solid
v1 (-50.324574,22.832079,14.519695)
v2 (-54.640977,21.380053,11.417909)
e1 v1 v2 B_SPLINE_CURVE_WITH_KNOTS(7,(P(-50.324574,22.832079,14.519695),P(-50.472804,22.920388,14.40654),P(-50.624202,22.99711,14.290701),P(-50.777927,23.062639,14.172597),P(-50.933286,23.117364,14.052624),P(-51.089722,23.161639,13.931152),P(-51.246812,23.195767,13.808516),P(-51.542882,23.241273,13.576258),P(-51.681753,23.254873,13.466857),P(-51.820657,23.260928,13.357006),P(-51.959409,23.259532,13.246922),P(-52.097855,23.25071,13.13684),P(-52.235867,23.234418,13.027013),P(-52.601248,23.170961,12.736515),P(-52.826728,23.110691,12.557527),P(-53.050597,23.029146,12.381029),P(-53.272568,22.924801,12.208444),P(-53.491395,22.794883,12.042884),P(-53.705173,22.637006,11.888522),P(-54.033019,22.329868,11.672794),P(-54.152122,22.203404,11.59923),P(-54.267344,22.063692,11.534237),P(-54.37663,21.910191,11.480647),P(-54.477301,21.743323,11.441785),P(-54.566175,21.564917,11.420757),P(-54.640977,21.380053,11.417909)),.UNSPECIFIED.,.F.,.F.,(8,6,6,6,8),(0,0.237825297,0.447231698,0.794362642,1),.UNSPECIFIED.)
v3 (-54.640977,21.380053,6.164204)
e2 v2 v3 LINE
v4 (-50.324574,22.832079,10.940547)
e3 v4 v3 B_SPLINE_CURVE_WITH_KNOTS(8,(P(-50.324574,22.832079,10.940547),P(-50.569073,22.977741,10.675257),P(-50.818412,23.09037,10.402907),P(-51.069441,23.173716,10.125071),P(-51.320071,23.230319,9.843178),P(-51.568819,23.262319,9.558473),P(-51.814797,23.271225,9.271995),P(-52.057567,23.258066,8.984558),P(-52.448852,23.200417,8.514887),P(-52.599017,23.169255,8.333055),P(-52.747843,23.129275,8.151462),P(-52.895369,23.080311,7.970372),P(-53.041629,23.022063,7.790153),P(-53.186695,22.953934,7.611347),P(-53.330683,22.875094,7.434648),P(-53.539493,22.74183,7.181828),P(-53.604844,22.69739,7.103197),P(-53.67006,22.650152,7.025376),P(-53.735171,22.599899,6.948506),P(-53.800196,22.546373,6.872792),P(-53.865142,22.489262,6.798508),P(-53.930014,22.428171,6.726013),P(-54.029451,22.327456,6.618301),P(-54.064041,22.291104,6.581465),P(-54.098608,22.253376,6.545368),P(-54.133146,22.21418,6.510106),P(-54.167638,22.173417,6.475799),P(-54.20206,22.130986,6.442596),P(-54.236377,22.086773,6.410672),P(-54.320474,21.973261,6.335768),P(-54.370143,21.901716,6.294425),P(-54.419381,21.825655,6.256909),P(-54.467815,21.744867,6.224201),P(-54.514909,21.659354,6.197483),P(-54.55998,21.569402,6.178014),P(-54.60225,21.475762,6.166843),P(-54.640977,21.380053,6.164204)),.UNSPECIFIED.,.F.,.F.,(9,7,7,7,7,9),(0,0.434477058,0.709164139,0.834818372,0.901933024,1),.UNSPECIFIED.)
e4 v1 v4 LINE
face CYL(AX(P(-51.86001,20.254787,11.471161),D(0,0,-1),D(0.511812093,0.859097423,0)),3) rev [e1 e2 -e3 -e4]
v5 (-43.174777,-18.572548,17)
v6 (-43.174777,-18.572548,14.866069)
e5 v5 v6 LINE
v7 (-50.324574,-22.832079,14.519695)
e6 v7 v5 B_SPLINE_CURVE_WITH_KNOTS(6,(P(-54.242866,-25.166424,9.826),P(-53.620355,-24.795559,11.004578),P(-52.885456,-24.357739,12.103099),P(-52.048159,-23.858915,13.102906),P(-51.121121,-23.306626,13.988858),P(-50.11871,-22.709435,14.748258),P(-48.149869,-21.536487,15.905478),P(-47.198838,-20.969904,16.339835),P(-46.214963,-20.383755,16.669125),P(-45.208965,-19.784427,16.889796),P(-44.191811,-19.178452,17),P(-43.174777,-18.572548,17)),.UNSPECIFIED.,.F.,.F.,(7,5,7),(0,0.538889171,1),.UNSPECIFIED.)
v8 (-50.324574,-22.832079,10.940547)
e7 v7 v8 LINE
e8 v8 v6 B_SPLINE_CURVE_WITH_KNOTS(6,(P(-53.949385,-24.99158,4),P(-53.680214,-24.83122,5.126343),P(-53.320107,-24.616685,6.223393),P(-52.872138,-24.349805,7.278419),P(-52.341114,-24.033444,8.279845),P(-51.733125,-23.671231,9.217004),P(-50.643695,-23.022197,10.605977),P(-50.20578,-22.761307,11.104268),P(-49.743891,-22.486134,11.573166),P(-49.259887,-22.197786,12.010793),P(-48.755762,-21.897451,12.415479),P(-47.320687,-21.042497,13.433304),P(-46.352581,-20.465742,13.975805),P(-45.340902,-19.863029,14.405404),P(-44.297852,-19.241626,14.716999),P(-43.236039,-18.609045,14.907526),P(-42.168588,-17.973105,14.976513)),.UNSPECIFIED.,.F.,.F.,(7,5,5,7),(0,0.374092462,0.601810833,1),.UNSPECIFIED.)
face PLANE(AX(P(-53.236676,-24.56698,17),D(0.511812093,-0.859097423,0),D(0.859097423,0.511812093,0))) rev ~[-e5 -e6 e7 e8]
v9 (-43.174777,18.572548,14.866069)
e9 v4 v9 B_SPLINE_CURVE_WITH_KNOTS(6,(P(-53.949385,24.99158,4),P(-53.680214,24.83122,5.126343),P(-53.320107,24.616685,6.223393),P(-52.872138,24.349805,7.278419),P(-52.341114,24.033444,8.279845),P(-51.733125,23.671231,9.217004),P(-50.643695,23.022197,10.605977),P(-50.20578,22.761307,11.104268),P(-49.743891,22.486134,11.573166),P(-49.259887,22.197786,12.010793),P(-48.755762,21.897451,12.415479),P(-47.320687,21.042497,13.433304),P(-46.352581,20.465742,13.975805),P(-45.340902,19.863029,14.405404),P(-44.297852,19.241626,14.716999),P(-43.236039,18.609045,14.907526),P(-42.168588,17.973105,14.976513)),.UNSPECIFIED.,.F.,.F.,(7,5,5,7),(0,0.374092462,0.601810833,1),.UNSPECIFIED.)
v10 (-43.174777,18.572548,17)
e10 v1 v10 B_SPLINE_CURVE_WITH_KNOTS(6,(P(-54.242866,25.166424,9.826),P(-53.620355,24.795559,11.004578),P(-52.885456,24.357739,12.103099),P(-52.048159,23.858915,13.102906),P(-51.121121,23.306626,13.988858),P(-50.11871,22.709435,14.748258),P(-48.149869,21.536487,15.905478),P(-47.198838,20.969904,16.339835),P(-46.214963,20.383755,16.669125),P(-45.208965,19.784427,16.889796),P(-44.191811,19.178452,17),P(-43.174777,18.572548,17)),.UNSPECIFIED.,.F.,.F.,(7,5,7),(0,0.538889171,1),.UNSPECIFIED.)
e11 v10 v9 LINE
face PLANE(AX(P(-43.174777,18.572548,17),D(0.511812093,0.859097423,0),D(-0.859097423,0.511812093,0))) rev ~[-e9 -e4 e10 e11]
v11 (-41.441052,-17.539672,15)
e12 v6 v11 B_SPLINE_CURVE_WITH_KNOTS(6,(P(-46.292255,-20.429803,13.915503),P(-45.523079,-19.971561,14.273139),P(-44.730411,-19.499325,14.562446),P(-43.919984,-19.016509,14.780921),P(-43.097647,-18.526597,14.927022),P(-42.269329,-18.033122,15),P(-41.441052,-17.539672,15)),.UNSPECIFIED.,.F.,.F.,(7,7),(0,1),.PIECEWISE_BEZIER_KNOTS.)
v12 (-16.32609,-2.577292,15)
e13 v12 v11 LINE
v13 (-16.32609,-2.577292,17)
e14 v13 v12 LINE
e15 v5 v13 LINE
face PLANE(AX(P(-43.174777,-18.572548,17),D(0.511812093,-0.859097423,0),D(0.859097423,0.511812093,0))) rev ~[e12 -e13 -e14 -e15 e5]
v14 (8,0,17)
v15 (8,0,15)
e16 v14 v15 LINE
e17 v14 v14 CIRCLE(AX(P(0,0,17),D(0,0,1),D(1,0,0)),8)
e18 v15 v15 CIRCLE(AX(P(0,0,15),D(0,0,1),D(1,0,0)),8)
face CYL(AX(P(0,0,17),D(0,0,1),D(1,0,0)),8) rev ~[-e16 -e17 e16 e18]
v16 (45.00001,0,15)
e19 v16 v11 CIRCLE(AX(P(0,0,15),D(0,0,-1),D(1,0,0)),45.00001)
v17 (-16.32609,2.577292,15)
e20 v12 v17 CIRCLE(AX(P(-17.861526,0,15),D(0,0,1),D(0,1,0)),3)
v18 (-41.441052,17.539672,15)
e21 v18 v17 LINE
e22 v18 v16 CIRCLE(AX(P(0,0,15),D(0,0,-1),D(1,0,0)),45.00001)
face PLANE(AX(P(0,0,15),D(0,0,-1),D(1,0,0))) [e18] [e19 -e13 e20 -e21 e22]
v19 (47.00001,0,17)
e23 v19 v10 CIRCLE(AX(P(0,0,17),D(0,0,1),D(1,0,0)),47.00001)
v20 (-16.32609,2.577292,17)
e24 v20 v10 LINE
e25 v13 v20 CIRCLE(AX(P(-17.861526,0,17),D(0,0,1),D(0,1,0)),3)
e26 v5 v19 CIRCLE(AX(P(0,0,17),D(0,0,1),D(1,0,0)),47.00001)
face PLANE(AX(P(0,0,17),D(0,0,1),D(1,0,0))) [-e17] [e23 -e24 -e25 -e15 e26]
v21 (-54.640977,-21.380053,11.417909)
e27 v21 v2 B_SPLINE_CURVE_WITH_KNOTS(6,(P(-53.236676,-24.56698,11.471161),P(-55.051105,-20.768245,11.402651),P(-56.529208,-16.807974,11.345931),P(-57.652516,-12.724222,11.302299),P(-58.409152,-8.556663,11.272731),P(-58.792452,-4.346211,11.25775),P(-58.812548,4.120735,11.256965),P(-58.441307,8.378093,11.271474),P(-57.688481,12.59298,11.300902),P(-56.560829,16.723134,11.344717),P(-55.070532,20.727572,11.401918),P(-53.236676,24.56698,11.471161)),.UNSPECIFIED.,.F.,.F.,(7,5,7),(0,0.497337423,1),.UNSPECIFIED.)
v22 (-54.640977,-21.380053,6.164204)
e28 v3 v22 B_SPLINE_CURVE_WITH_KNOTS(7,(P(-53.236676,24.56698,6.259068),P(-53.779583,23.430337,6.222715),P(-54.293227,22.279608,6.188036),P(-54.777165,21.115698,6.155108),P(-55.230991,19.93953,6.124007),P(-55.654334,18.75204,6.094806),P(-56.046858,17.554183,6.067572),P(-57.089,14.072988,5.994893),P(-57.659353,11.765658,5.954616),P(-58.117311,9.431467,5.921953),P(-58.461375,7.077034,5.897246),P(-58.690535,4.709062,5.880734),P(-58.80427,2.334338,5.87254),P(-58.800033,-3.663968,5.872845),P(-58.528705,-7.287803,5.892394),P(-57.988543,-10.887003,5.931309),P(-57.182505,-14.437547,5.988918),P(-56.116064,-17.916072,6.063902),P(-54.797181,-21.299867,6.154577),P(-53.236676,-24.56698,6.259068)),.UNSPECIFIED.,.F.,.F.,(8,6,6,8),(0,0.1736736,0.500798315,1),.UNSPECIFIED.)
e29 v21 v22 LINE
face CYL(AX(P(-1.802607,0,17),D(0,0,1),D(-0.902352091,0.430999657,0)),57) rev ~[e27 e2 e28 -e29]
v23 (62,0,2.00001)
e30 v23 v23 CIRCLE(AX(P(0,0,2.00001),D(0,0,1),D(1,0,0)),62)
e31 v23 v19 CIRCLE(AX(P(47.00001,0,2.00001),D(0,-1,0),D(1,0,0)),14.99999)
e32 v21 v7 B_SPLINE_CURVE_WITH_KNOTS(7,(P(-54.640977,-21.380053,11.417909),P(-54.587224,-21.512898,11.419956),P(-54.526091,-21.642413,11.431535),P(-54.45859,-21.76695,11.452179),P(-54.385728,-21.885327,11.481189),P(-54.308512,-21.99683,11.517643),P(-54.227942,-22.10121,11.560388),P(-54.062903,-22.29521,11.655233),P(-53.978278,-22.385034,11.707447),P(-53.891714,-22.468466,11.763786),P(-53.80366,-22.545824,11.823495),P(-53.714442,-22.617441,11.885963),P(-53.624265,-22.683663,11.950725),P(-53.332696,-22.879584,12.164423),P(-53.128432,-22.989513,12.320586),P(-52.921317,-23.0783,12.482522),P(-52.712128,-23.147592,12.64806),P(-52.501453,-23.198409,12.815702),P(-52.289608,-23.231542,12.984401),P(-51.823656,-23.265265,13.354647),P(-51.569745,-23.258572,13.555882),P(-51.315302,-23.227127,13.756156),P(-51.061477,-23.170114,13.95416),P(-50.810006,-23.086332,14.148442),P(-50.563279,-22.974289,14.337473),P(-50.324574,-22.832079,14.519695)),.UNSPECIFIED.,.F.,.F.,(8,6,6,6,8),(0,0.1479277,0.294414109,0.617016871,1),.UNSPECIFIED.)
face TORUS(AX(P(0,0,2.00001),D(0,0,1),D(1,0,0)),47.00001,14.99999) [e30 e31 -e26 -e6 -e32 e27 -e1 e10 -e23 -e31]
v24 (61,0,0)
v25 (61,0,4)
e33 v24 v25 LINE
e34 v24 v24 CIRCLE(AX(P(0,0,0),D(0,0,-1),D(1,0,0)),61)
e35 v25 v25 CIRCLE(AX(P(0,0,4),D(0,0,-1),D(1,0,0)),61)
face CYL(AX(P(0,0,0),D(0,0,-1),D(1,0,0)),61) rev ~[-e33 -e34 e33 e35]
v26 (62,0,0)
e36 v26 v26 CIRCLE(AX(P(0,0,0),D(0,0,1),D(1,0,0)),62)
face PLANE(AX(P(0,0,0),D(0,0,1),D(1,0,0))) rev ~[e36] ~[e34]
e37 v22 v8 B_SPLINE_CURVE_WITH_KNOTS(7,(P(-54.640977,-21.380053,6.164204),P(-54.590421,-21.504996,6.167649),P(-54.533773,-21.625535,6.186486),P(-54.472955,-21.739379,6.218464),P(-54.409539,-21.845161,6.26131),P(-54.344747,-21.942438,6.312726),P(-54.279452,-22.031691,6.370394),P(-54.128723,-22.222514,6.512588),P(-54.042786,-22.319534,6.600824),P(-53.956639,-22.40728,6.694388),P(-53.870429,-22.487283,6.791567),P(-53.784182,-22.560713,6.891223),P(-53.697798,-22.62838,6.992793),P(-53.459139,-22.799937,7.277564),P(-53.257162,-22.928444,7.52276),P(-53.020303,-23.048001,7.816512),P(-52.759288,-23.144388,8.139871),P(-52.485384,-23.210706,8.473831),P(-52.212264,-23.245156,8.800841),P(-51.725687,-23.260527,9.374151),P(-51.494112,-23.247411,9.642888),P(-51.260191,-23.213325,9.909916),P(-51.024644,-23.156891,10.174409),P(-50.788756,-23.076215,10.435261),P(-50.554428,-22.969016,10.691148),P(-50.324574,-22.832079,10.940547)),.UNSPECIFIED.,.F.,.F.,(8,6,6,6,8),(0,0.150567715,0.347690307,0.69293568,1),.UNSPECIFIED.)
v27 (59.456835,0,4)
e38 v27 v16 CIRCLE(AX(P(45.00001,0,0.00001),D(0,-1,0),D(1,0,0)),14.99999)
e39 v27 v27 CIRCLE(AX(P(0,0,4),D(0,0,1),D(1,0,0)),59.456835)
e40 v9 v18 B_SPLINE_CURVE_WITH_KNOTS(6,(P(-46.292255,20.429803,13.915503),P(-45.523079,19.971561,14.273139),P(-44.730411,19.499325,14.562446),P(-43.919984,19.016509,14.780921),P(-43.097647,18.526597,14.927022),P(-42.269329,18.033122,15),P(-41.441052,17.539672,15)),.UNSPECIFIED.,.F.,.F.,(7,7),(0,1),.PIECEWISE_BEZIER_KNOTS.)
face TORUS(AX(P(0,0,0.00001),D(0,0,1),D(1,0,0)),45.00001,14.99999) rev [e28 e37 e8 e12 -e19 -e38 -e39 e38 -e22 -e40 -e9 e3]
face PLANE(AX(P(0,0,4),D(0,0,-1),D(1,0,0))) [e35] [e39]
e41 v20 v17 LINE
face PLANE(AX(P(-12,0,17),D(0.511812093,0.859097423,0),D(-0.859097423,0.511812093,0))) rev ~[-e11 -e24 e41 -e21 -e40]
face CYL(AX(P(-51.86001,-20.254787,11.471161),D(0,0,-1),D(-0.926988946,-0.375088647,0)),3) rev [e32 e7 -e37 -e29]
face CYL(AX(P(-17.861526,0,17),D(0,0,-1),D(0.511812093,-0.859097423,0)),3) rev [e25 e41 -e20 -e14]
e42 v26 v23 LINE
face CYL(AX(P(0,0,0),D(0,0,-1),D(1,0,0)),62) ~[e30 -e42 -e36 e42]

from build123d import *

# Parameters (mm, degrees)
F0_R      = 62
F1_DEPTH  = 17
F2_R      = 60
F3_DEPTH  = 15
F4_R      = 14.99999
F5_R      = 61
F6_DEPTH  = 4
F8_DEPTH  = 25
F9_R      = 3
F10_R     = 8
F11_DEPTH = 25


# Not quite as in the source:
# - a fillet or chamfer is up to 0.001 mm smaller than in the source, because OpenCascade refuses the exact size


with BuildPart() as f1:
    # F0 (on Top) → F1 (new body)
    with BuildSketch(Plane.XY):
        Circle(F0_R)
    extrude(amount=F1_DEPTH)

    # F2 (on face) → F3 (cut)
    with BuildSketch(Plane(origin=(0, 0, 0), x_dir=(1, 0, 0), z_dir=(0, 0, -1))):
        Circle(F2_R)
    extrude(amount=-F3_DEPTH, mode=Mode.SUBTRACT)

    # F4 (radius 15 in the source; OpenCascade refuses exactly that, so slightly less here)
    f4_edges = [f1.edges().sort_by_distance(p)[0] for p in [
        (-60, 0, 15),
        (-62, 0, 17),
    ]]
    fillet(f4_edges, radius=F4_R)

    # F5 (on face) → F6 (cut)
    with BuildSketch(Plane(origin=(0, 0, 0), x_dir=(1, 0, 0), z_dir=(0, 0, -1))):
        Circle(F5_R)
    extrude(amount=-F6_DEPTH, mode=Mode.SUBTRACT)

    # F7 (on face) → F8 (cut)
    with BuildSketch(Plane.XY.offset(17)):
        with BuildLine():
            Line((-43.1747773956, -18.5725479362), (-12, 0))
            Line((-12, 0), (-43.1747773956, 18.5725479362))
            ThreePointArc((-43.1747773956, 18.5725479362), (-47.00001, 0), (-43.1747773956, -18.5725479362))
        make_face()
        with BuildLine():
            ThreePointArc((-43.1747773956, -18.5725479362), (-47.00001, 0), (-43.1747773956, 18.5725479362))
            Line((-43.1747773956, 18.5725479362), (-53.2366762866, 24.5669804581))
            ThreePointArc((-53.2366762866, 24.5669804581), (-58.8026071187, 0), (-53.2366762866, -24.5669804581))
            Line((-53.2366762866, -24.5669804581), (-43.1747773956, -18.5725479362))
        make_face()
    extrude(amount=-F8_DEPTH, mode=Mode.SUBTRACT)

    # F9
    f9_edges = [f1.edges().sort_by_distance(p)[0] for p in [
        (-12, 0, 16),
        (-53.236676, -24.56698, 8.865114),
        (-53.236676, 24.56698, 8.865114),
    ]]
    fillet(f9_edges, radius=F9_R)

    # F10 (on face) → F11 (cut)
    with BuildSketch(Plane.XY.offset(17)):
        Circle(F10_R)
    extrude(amount=-F11_DEPTH, mode=Mode.SUBTRACT)


solid = f1.part
